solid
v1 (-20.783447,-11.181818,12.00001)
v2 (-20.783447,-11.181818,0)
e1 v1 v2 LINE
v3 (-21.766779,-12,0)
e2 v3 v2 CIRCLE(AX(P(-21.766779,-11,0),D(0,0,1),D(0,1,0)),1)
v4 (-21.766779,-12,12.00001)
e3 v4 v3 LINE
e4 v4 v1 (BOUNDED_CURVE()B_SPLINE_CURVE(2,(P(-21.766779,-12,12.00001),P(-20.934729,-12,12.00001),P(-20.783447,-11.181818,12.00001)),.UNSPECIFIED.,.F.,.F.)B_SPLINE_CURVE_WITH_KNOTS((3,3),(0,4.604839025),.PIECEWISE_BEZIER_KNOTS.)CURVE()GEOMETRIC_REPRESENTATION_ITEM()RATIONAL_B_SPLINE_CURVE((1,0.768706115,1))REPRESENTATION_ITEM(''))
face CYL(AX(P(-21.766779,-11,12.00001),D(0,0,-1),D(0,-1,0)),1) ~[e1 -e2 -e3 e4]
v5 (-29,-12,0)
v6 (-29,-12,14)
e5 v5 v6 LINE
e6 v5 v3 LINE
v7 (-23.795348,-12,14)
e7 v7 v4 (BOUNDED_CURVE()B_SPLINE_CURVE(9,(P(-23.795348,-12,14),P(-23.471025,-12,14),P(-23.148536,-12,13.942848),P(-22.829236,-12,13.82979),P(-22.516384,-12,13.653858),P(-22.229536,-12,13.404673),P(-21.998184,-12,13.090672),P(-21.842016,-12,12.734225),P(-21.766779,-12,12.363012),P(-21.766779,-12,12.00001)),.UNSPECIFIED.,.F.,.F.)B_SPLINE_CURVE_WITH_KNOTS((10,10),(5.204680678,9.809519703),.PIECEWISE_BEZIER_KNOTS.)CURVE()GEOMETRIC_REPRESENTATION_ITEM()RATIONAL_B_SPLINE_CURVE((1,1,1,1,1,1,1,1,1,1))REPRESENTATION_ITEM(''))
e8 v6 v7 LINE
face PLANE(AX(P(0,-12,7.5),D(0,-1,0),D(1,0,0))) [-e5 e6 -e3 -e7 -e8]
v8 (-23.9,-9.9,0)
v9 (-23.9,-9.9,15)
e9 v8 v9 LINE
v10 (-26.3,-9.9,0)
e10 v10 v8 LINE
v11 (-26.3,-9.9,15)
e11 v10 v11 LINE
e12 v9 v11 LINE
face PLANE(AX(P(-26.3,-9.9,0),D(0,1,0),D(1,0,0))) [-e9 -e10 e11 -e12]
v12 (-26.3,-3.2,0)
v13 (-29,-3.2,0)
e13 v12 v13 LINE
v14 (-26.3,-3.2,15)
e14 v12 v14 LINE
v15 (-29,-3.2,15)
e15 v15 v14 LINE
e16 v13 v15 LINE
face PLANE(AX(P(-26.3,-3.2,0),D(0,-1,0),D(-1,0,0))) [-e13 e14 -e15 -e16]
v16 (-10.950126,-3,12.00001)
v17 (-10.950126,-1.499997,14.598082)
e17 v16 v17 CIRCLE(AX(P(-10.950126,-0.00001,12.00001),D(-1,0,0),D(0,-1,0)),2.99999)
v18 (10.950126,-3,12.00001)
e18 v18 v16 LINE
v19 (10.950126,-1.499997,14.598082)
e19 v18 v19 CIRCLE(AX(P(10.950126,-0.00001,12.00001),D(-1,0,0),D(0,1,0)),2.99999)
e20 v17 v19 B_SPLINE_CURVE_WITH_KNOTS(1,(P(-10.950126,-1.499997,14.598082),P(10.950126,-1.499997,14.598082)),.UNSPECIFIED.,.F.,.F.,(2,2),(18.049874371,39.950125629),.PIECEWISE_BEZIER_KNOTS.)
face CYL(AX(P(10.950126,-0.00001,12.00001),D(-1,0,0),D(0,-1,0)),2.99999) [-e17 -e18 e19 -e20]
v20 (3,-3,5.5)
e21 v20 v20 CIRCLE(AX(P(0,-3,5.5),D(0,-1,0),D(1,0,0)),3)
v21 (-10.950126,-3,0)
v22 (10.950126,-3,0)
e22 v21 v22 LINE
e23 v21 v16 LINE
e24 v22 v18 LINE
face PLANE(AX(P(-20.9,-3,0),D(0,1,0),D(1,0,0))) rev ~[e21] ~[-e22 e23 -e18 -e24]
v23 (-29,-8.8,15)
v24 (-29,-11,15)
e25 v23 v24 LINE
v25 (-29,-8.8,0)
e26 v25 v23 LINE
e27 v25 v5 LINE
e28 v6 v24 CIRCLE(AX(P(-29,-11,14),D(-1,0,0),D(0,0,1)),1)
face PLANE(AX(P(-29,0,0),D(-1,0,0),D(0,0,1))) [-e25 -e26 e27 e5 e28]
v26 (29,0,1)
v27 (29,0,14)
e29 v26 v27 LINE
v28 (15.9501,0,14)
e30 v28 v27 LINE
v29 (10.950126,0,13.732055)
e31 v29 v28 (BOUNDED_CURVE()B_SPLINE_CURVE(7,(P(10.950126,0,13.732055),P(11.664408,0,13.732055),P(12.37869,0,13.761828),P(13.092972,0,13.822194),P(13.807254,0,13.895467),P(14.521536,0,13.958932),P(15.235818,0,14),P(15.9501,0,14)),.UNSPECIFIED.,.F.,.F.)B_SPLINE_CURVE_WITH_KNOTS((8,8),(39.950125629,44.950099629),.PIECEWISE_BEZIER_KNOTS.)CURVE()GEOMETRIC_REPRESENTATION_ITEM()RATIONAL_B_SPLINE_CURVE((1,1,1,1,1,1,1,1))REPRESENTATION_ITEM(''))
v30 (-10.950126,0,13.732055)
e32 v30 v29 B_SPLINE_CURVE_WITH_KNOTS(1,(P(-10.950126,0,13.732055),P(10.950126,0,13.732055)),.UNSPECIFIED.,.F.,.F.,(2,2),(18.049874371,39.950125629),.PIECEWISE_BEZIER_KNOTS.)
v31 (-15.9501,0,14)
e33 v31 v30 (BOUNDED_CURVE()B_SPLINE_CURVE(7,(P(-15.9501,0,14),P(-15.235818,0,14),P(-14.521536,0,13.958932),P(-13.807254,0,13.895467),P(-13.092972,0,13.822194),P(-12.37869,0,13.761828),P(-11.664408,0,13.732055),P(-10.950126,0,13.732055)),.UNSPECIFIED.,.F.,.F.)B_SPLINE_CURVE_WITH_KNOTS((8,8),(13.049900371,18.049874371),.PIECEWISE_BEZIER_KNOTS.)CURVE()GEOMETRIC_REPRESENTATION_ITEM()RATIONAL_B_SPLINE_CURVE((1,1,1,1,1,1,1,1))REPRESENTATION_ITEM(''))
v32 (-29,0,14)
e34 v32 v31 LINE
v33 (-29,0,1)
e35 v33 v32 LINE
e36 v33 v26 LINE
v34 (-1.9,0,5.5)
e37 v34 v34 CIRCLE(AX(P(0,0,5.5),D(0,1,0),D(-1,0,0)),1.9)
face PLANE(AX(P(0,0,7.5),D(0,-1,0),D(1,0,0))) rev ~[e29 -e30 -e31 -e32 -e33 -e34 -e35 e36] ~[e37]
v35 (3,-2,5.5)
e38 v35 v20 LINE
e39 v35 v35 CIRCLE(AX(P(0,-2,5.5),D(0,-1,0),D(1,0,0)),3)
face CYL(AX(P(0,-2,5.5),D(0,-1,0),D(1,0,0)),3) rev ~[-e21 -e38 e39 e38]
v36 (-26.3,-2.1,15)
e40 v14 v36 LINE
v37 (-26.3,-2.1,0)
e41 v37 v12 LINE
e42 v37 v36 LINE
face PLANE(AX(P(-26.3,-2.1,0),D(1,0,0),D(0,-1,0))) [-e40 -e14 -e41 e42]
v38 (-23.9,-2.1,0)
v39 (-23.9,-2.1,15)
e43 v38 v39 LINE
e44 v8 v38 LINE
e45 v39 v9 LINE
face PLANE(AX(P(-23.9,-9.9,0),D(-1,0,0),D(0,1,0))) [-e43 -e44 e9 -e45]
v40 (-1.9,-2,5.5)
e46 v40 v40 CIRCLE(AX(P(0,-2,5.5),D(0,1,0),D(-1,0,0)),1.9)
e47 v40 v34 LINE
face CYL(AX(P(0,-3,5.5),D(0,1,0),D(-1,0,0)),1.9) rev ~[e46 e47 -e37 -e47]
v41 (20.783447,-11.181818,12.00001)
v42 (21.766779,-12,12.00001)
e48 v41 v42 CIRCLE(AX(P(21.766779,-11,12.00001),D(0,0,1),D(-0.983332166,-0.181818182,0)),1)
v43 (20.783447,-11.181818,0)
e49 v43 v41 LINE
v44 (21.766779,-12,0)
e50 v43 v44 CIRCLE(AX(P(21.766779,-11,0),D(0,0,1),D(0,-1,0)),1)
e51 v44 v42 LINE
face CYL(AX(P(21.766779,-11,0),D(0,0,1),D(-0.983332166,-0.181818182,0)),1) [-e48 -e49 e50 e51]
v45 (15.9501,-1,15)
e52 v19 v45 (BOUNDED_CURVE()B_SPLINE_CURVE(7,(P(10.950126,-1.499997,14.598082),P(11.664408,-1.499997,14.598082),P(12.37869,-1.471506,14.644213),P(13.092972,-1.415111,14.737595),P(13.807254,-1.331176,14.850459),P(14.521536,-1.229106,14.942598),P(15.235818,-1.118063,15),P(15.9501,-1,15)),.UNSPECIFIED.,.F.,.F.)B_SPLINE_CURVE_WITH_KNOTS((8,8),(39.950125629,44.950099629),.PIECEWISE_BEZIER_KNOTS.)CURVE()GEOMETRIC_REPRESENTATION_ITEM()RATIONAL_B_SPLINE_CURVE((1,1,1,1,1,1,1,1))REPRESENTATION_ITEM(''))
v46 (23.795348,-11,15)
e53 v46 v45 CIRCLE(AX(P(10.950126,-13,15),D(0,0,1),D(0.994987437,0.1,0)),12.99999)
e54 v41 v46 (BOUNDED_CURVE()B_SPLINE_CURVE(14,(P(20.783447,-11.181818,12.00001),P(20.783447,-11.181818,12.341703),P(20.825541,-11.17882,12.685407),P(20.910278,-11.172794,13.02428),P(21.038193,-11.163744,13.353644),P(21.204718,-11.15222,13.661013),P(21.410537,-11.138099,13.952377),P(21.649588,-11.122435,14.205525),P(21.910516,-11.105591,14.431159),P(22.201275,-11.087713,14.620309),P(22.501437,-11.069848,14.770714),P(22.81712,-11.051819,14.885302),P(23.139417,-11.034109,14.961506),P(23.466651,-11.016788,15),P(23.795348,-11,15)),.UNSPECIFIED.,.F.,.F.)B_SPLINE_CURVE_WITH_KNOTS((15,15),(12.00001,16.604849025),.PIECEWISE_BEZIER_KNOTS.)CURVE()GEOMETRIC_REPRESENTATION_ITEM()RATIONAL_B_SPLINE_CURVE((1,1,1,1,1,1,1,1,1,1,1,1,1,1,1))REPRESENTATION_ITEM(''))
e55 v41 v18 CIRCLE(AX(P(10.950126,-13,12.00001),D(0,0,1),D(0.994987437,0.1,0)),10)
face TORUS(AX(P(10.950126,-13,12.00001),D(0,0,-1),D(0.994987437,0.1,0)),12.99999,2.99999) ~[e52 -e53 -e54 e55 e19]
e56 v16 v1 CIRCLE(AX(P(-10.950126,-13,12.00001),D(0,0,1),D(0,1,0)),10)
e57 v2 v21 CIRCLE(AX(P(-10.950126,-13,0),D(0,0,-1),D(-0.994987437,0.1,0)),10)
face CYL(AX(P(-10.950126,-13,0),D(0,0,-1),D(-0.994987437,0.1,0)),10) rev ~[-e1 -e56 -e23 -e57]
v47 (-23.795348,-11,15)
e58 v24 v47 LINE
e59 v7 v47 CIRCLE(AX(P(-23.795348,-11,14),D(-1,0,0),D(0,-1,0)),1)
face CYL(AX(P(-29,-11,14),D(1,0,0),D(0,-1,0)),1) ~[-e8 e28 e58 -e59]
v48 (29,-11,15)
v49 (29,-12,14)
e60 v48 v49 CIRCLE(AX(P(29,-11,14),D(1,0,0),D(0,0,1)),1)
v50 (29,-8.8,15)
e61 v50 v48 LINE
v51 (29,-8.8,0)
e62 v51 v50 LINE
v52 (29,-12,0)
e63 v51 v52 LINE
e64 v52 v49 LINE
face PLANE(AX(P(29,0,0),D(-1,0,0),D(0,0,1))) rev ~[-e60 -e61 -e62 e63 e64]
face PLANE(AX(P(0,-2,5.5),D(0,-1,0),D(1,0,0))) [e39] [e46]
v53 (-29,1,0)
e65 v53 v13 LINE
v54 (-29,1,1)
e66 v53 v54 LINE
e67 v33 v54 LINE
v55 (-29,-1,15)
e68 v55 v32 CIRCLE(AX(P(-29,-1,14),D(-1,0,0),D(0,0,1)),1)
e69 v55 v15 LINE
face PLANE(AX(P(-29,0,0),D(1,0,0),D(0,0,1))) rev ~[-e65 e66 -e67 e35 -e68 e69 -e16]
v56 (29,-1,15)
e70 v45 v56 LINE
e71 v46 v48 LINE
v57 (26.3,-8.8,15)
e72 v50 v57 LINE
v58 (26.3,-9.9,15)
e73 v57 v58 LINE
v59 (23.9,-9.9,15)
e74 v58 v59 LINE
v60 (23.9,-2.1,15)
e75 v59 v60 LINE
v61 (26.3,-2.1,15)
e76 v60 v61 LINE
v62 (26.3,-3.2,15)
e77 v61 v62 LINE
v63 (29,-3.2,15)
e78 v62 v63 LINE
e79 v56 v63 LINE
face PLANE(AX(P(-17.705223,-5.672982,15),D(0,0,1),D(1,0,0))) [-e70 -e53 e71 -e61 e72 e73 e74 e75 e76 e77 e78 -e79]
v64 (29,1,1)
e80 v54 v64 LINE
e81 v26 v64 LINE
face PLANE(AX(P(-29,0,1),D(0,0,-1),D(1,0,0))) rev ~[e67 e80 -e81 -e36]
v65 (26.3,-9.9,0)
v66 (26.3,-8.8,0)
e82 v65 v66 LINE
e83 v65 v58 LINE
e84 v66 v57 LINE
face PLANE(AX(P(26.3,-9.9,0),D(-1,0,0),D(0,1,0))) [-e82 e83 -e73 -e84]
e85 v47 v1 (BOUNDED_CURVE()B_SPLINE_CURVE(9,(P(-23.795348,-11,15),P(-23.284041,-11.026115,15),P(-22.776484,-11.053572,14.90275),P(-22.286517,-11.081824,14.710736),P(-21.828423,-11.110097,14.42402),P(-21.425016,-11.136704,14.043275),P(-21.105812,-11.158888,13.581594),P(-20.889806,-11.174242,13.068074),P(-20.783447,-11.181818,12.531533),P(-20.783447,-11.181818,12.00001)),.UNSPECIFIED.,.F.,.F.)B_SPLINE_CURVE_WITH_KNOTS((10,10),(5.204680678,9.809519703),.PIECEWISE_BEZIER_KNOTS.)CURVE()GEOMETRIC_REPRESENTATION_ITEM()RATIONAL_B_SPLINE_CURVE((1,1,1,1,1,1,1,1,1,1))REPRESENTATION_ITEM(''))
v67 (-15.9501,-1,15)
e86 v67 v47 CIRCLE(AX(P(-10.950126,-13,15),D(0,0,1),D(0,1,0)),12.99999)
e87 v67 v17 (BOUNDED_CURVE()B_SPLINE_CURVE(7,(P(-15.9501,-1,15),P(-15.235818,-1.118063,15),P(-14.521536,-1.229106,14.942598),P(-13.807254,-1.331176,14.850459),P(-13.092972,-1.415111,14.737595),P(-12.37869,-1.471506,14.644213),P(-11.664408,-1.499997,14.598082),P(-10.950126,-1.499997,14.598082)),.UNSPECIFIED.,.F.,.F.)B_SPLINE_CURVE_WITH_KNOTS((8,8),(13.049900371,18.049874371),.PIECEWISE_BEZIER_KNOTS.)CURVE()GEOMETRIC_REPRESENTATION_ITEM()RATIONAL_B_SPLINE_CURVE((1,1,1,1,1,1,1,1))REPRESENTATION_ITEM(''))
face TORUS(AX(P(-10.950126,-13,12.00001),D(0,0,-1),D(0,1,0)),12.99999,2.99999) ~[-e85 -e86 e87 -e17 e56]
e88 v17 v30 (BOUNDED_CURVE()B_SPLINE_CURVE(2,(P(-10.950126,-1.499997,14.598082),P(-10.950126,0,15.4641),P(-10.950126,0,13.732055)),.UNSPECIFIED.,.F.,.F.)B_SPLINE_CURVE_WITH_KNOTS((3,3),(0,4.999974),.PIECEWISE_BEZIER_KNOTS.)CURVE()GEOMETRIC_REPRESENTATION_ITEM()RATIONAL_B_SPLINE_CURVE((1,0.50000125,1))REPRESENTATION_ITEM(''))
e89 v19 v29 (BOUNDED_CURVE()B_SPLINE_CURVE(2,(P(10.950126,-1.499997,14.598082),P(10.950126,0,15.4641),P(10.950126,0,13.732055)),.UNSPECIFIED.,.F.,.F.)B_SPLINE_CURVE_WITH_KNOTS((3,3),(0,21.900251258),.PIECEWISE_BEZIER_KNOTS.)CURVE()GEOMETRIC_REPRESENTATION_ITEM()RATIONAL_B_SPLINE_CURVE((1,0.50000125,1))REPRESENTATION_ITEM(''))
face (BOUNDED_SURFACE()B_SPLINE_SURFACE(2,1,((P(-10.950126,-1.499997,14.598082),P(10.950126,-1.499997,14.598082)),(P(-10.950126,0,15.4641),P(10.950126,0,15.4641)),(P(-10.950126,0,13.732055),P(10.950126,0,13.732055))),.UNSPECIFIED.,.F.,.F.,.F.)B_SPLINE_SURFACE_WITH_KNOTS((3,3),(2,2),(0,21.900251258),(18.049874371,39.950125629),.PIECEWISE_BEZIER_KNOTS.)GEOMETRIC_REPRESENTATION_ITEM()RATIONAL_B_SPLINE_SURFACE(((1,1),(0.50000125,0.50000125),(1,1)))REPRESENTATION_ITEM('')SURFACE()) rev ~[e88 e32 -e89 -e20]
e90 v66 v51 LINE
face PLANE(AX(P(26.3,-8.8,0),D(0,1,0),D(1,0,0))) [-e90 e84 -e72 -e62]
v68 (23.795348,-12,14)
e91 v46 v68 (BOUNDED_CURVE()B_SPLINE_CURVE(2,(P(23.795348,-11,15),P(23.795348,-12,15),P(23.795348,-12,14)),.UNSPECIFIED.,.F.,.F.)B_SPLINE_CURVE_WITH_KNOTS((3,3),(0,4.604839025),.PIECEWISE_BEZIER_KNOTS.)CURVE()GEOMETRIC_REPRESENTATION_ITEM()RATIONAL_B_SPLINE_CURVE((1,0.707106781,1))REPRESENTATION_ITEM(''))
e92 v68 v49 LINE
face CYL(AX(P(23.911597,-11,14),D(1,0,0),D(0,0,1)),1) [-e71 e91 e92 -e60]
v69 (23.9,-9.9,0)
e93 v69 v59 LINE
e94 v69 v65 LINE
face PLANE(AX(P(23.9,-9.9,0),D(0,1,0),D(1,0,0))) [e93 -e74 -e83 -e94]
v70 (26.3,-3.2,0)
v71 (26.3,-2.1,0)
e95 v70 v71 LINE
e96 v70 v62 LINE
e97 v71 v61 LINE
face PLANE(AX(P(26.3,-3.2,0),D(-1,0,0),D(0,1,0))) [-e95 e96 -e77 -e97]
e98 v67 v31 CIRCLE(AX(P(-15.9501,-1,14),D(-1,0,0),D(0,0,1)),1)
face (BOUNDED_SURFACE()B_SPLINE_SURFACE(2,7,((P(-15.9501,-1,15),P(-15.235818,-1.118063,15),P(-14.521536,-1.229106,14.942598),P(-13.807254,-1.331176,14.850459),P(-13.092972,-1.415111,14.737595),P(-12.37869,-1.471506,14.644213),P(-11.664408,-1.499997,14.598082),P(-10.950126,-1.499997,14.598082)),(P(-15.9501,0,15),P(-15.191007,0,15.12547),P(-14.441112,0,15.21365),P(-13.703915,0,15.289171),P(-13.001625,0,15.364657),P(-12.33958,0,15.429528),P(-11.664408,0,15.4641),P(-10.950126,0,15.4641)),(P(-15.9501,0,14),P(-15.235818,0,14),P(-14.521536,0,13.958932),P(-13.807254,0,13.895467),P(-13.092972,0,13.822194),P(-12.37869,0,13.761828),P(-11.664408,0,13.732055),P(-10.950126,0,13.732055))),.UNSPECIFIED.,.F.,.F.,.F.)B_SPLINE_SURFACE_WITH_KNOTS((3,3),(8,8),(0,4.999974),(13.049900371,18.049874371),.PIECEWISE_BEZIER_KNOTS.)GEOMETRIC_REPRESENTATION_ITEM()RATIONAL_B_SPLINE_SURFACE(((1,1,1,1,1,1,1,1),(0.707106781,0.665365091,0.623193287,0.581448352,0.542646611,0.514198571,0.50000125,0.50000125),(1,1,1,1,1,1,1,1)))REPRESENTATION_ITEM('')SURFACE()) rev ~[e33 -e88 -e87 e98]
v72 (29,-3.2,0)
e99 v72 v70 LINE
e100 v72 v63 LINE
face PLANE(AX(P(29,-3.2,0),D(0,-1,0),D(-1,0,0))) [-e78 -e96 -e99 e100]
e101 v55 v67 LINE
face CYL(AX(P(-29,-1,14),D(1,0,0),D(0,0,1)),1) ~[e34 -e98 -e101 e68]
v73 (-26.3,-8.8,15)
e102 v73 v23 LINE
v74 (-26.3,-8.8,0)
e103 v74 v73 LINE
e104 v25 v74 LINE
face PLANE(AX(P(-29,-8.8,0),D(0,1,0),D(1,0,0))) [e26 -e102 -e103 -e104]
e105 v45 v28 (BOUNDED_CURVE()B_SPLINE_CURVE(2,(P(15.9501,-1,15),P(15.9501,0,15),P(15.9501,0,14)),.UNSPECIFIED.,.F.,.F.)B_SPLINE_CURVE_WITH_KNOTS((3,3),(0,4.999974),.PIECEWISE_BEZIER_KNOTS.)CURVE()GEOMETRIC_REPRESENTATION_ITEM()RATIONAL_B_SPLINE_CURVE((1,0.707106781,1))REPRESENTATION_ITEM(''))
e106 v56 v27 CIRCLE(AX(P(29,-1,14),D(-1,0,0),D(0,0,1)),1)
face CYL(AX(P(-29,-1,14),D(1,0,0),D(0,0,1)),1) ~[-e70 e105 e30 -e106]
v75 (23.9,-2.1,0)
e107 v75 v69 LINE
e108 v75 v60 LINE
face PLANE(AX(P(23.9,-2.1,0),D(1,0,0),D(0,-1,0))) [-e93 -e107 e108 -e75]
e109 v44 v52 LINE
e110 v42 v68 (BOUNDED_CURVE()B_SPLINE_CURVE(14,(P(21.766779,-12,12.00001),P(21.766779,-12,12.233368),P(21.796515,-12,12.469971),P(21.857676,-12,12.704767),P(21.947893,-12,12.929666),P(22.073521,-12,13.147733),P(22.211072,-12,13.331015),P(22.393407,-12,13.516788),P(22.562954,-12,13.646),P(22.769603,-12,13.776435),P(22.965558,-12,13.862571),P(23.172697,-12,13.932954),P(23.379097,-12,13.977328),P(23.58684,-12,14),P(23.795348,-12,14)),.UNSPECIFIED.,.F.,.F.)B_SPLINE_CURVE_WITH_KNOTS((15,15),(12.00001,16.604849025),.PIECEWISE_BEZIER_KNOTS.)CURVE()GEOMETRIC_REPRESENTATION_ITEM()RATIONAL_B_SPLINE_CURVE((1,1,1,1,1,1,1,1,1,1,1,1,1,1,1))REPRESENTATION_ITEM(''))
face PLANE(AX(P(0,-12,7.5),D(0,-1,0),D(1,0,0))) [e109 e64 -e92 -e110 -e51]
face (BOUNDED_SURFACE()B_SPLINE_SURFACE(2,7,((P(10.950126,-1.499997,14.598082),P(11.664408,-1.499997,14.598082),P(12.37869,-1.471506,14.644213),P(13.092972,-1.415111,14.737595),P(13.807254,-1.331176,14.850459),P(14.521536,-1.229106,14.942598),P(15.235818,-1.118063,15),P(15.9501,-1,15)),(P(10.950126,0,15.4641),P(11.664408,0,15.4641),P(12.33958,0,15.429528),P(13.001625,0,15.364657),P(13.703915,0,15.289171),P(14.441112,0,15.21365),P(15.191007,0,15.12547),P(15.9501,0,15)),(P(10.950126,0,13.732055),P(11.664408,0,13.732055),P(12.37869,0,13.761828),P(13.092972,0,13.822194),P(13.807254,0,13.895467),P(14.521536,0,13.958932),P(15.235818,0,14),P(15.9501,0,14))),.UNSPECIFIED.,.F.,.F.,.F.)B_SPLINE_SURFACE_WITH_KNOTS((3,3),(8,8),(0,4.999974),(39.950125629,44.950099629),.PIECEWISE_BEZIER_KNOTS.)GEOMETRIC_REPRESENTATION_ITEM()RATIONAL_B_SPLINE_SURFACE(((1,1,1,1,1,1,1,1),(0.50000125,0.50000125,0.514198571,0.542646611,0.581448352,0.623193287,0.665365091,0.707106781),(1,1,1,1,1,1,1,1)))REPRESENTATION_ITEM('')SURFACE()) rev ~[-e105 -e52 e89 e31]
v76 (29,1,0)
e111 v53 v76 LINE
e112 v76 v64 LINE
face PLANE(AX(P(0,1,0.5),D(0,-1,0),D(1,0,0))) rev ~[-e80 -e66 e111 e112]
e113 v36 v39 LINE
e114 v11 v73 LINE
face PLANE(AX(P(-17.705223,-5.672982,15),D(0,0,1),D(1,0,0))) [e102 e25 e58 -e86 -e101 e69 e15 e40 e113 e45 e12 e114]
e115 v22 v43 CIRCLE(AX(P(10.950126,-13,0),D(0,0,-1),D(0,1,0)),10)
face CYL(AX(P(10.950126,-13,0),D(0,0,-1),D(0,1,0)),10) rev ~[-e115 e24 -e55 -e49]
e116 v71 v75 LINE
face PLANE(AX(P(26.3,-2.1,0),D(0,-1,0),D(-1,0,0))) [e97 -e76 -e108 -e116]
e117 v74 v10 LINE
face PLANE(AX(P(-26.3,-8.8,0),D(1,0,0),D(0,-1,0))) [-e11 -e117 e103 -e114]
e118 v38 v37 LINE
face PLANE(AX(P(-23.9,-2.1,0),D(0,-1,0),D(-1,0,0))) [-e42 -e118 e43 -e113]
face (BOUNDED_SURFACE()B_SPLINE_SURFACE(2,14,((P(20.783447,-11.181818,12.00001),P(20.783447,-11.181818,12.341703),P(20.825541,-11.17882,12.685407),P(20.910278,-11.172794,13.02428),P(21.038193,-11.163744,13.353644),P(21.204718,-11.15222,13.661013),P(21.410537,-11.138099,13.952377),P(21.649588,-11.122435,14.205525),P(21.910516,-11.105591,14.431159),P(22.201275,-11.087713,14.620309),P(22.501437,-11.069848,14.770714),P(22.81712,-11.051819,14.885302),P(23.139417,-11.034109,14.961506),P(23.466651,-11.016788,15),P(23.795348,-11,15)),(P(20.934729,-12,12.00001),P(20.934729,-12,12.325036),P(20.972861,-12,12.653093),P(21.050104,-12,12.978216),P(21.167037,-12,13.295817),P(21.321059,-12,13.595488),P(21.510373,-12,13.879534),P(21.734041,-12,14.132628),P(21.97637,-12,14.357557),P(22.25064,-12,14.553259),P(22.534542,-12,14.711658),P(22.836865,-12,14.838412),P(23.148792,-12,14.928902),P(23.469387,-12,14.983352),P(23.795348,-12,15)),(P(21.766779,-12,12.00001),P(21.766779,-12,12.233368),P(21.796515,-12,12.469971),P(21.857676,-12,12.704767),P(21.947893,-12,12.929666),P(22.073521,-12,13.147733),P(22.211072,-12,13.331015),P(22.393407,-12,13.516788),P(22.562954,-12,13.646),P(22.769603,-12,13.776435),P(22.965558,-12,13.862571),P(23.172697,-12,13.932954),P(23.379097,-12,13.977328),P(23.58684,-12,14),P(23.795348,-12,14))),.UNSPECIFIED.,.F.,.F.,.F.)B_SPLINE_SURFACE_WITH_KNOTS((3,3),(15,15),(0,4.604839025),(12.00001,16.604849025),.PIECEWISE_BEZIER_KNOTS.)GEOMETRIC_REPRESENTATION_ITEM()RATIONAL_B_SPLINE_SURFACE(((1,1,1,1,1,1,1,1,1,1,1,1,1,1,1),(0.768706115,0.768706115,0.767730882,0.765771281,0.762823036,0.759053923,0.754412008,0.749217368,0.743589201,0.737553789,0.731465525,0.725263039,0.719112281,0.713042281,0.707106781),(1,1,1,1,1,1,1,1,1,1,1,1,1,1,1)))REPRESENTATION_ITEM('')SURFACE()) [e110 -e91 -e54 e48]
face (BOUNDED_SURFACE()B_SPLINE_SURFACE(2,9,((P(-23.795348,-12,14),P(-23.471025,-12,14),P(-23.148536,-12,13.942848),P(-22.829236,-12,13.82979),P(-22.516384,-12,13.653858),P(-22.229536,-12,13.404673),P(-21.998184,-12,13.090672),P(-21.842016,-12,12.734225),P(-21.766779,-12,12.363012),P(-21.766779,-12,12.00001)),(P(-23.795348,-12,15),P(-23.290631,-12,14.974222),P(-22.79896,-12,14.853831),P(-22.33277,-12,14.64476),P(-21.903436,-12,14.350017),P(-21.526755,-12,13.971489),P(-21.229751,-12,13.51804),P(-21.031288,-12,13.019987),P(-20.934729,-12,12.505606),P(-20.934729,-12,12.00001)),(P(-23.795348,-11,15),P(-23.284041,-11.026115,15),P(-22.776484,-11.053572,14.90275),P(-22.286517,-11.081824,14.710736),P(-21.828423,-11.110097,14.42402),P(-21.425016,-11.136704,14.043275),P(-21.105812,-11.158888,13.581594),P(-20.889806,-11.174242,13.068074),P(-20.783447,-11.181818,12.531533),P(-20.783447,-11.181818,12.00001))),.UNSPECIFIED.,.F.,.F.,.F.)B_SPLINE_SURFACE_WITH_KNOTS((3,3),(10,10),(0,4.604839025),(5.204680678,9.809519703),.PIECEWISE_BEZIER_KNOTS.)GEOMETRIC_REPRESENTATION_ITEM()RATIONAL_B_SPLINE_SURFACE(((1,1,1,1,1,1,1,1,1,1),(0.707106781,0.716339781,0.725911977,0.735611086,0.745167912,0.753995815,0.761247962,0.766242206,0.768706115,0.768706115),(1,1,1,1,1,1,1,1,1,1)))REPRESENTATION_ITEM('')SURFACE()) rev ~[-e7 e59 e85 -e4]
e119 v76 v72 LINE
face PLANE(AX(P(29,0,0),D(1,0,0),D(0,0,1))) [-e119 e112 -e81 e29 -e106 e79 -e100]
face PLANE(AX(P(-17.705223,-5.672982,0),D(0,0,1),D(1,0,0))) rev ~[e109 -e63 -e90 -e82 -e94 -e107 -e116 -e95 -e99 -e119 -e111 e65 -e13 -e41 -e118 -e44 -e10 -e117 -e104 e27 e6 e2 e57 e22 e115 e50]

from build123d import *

# Parameters (mm, degrees)
F0_W           = 58
F0_H           = 15
F2_DEPTH       = 12
F4_DEPTH       = 25
F5_W           = 41.8
F5_H           = 9
F6_DEPTH       = 25
F1_W           = 58
F1_H           = 1
F8_DEPTH       = 1
F9_D           = 3.8
F9_CBORE_D     = 6
F9_CBORE_DEPTH = 1
F10_T1_DEPTH   = 15
F11_R          = 2.99999
F12_R          = 1
F13_R          = 1


# Not quite as in the source:
# - a fillet or chamfer that OpenCascade refuses, or shapes differently, is made with other operations: its cross-section is extruded or revolved along the edge and cut away or added
# - a fillet or chamfer is up to 0.001 mm smaller than in the source, because OpenCascade refuses the exact size


with BuildPart() as f2:
    # F0 (on Front) → F2 (new body)
    with BuildSketch(Plane.XZ):
        with Locations((0, 7.5)):
            Rectangle(F0_W, F0_H)
    extrude(amount=F2_DEPTH)

    # F3 (on Top) → F4 (cut)
    with BuildSketch(Plane.XY):
        Polygon((-26.3, -3.2), (-29, -3.2), (-29, -8.8), (-26.3, -8.8), (-26.3, -9.9), (-23.9, -9.9), (-23.9, -2.1), (-26.3, -2.1), align=None)
        Polygon((29, -8.8), (29, -3.2), (26.3, -3.2), (26.3, -2.1), (23.9, -2.1), (23.9, -9.9), (26.3, -9.9), (26.3, -8.8), align=None)
    extrude(amount=F4_DEPTH, mode=Mode.SUBTRACT)

    # F5 (on Top) → F6 (cut)
    with BuildSketch(Plane.XY):
        with Locations((0, -7.5)):
            Rectangle(F5_W, F5_H)
    extrude(amount=F6_DEPTH, mode=Mode.SUBTRACT)

    # F1 (on Front) → F8 (join)
    with BuildSketch(Plane.XZ):
        with Locations((0, 0.5)):
            Rectangle(F1_W, F1_H)
    extrude(amount=-F8_DEPTH)

    # F9 (through all)
    with Locations(Plane.XZ.offset(3)):
        with Locations((0, 5.5)):
            CounterBoreHole(F9_D / 2, F9_CBORE_D / 2, F9_CBORE_DEPTH)

    # F10: fillet of radius 10 on 2 edges, made by hand

    # F10_s2 → F10_t1 (join)
    with BuildSketch(Plane.XY):
        with BuildLine():
            ThreePointArc((-20.9, -12), (-17.6583295614, -5.5838015129), (-10.9501256289, -3))
            Line((-10.9501256289, -3), (-20.9, -3))
            Line((-20.9, -3), (-20.9, -12))
        make_face()
        with BuildLine():
            ThreePointArc((10.9501256289, -3), (17.6583295614, -5.5838015129), (20.9, -12))
            Line((20.9, -12), (20.9, -3))
            Line((20.9, -3), (10.9501256289, -3))
        make_face()
    extrude(amount=F10_T1_DEPTH)

    # F11 (radius 3 in the source; OpenCascade refuses exactly that, so slightly less here)
    f11_edges = [f2.edges().sort_by_distance(p)[0] for p in [
        (0, -3, 15),
        (17.65833, -5.583802, 15),
        (-17.65833, -5.583802, 15),
    ]]
    fillet(f11_edges, radius=F11_R)

    # F12
    f12_edges = [f2.edges().sort_by_distance(p)[0] for p in [
        (-26.455798, -12, 15),
        (26.455798, -12, 15),
    ]]
    fillet(f12_edges, radius=F12_R)

    # F13
    f13_edges = [f2.edges().sort_by_distance(p)[0] for p in [
        (0, 0, 15),
    ]]
    fillet(f13_edges, radius=F13_R)


solid = f2.part
